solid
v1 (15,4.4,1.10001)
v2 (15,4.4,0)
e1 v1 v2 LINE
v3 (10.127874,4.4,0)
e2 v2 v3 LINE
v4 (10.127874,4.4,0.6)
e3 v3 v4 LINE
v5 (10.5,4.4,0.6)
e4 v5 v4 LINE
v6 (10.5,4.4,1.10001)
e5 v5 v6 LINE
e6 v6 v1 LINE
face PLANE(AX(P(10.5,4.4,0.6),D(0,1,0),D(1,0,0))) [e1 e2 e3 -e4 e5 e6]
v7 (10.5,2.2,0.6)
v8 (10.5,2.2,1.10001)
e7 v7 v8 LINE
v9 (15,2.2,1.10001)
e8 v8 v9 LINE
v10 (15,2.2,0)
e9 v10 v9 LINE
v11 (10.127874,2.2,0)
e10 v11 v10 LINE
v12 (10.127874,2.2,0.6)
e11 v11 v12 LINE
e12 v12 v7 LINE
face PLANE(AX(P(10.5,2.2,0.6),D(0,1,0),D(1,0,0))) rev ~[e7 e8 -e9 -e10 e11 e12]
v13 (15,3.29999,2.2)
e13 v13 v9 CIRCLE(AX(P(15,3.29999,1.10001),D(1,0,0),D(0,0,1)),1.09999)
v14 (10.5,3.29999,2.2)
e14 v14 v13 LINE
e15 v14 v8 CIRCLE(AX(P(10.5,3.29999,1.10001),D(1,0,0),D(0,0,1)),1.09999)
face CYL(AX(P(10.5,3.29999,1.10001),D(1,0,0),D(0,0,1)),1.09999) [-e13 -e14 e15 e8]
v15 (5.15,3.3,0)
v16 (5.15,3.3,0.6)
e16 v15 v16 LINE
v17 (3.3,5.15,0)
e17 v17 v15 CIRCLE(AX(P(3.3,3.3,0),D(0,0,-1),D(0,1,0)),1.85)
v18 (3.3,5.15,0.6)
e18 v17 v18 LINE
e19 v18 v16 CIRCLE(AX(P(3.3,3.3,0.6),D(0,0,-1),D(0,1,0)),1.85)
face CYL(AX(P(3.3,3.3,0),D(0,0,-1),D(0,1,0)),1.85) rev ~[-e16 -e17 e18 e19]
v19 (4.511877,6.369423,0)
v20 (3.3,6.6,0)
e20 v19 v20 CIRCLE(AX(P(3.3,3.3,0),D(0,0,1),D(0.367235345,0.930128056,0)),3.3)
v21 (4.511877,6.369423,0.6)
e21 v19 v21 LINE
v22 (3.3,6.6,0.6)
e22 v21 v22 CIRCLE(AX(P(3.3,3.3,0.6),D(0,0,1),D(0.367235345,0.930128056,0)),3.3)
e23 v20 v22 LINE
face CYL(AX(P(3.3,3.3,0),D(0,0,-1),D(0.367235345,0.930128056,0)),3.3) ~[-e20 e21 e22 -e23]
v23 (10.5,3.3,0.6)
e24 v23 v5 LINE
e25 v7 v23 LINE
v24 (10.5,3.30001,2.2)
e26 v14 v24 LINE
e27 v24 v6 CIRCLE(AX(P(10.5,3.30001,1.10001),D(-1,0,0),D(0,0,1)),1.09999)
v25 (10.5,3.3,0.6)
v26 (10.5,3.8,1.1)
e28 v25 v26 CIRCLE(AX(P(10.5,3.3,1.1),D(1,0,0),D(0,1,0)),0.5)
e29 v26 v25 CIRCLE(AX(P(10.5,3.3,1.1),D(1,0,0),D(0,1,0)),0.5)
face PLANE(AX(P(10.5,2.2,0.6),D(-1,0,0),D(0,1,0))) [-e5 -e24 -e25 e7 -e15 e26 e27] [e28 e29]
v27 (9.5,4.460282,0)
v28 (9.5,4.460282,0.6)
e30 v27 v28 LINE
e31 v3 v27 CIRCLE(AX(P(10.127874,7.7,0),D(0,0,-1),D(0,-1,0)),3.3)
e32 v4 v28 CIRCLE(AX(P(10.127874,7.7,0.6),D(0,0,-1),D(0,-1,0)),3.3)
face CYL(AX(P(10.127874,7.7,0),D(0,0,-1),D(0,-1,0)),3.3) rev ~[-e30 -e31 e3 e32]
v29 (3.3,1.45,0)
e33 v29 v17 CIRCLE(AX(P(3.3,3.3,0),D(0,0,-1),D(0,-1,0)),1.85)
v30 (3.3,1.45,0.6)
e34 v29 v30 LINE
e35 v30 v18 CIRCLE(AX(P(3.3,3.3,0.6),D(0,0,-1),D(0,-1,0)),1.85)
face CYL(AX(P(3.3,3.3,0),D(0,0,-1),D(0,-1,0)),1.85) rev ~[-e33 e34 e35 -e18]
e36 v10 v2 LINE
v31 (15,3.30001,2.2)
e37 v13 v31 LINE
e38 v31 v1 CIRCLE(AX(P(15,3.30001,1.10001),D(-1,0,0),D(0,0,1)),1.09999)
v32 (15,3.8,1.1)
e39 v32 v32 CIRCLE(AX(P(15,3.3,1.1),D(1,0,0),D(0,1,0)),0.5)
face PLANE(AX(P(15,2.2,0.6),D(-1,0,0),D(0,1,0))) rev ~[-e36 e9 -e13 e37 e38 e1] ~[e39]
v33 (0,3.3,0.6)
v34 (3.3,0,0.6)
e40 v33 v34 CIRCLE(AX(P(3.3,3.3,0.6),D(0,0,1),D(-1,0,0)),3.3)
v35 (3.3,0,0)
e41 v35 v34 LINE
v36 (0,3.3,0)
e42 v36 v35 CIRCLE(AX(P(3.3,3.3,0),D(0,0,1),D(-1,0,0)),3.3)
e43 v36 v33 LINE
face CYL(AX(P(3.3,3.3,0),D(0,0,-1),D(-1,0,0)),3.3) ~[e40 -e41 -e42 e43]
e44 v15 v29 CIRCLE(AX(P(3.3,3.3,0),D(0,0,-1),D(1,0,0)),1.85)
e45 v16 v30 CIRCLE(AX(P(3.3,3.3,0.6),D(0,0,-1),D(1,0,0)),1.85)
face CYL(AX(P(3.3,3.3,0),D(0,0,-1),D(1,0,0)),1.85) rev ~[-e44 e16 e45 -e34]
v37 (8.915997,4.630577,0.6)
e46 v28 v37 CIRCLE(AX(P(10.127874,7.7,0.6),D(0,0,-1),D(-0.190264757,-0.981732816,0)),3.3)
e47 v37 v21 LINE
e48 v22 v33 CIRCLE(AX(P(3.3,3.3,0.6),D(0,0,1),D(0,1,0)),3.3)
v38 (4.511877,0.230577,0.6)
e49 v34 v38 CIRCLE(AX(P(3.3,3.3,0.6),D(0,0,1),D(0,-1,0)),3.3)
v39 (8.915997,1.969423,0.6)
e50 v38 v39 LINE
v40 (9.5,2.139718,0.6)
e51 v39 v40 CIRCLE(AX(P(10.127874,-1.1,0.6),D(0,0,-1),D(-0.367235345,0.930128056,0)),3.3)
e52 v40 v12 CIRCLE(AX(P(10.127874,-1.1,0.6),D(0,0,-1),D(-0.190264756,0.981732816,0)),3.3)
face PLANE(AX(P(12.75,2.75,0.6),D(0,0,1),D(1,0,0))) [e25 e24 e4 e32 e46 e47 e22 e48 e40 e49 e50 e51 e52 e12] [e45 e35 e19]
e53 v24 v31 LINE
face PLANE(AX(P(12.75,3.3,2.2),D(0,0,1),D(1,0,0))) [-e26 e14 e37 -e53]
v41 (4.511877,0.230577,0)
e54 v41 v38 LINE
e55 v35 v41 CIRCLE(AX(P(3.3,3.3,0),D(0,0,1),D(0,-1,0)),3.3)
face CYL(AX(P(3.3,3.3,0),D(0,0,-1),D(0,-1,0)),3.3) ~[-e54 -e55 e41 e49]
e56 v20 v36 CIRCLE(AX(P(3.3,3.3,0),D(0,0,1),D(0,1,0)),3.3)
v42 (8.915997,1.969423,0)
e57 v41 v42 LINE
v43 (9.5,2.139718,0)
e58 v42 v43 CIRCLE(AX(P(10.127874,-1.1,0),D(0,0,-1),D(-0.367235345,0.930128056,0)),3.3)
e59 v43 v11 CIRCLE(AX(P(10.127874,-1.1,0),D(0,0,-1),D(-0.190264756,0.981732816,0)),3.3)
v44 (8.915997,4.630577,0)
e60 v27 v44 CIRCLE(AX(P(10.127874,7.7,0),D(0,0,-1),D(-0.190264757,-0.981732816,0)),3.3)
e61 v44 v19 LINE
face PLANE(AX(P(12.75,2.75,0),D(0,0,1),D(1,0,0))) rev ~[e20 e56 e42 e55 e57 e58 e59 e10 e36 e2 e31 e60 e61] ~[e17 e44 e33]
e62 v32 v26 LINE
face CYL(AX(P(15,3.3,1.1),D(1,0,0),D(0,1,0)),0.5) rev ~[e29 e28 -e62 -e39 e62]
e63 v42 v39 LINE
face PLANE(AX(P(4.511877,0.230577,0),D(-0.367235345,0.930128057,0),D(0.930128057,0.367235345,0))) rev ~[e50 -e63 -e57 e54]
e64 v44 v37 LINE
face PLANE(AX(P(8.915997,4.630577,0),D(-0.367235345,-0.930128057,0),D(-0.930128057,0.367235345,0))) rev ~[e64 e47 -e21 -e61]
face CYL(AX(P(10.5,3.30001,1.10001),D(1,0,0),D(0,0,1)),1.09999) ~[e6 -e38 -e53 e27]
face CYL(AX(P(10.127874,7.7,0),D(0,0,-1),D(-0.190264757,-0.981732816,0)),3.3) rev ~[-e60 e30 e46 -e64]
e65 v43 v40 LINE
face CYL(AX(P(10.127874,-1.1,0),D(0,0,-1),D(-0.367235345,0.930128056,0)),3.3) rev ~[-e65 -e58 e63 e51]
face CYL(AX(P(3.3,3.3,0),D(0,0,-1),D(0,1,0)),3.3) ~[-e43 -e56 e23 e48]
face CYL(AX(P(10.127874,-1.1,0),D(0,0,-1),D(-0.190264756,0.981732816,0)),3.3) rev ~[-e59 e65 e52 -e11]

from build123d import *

# Parameters (mm, degrees)
F0_W     = 4.5
F0_H     = 1.1
F1_DEPTH = 0.6
F2_W     = 4.5
F2_H     = 2.2
F3_DEPTH = 1.6
F4_R     = 1.09999
F5_R     = 0.5
F6_DEPTH = 25


# Not quite as in the source:
# - a fillet or chamfer is up to 0.001 mm smaller than in the source, because OpenCascade refuses the exact size


with BuildPart() as f1:
    # F0 (on Top) → F1 (new body)
    with BuildSketch(Plane.XY):
        with Locations((12.75, 2.75)):
            Rectangle(F0_W, F0_H)
        with Locations((12.75, 3.85)):
            Rectangle(F0_W, F0_H)
        with BuildLine():
            Line((10.1278736967, 2.2), (10.5, 2.2))
            Line((10.5, 2.2), (10.5, 3.3))
            Line((10.5, 3.3), (9.5, 3.3))
            Line((9.5, 3.3), (9.5, 2.1397182935))
            ThreePointArc((9.5, 2.1397182935), (9.8124932664, 2.1848950035), (10.1278736967, 2.2))
        make_face()
        with BuildLine():
            Line((9.5, 3.3), (10.5, 3.3))
            Line((10.5, 3.3), (10.5, 4.4))
            Line((10.5, 4.4), (10.1278736967, 4.4))
            ThreePointArc((10.1278736967, 4.4), (9.8124932664, 4.4151049965), (9.5, 4.4602817065))
            Line((9.5, 4.4602817065), (9.5, 3.3))
        make_face()
        with BuildLine():
            Line((9.5, 2.1397182935), (9.5, 3.3))
            Line((9.5, 3.3), (9.5, 4.4602817065))
            ThreePointArc((9.5, 4.4602817065), (9.2040660975, 4.5319438894), (8.9159970588, 4.6305774135))
            Line((8.9159970588, 4.6305774135), (4.5118766379, 6.3694225865))
            ThreePointArc((4.5118766379, 6.3694225865), (3.9168085053, 6.5418431899), (3.3, 6.6))
            Line((3.3, 6.6), (3.3, 5.15))
            ThreePointArc((3.3, 5.15), (4.6081475452, 4.6081475452), (5.15, 3.3))
            ThreePointArc((5.15, 3.3), (4.6081475452, 1.9918524548), (3.3, 1.45))
            Line((3.3, 1.45), (3.3, 0))
            ThreePointArc((3.3, 0), (3.9168085053, 0.0581568101), (4.5118766379, 0.2305774135))
            Line((4.5118766379, 0.2305774135), (8.9159970588, 1.9694225865))
            ThreePointArc((8.9159970588, 1.9694225865), (9.2040660975, 2.0680561106), (9.5, 2.1397182935))
        make_face()
        with BuildLine():
            ThreePointArc((0, 3.3), (0.9665476221, 0.9665476221), (3.3, 0))
            Line((3.3, 0), (3.3, 1.45))
            ThreePointArc((3.3, 1.45), (1.45, 3.3), (3.3, 5.15))
            Line((3.3, 5.15), (3.3, 6.6))
            ThreePointArc((3.3, 6.6), (0.9665476221, 5.6334523779), (0, 3.3))
        make_face()
    extrude(amount=F1_DEPTH)

    # F2 (on face) → F3 (join)
    with BuildSketch(Plane.XY.offset(0.6)):
        with Locations((12.75, 3.3)):
            Rectangle(F2_W, F2_H)
    extrude(amount=F3_DEPTH)

    # F4 (radius 1.1 in the source; OpenCascade refuses exactly that, so slightly less here)
    f4_edges = [f1.edges().sort_by_distance(p)[0] for p in [
        (12.75, 2.2, 2.2),
        (12.75, 4.4, 2.2),
    ]]
    fillet(f4_edges, radius=F4_R)

    # F5 (on face) → F6 (cut)
    with BuildSketch(Plane.YZ.offset(15)):
        with Locations((3.3, 1.1)):
            Circle(F5_R)
    extrude(amount=-F6_DEPTH, mode=Mode.SUBTRACT)


solid = f1.part
